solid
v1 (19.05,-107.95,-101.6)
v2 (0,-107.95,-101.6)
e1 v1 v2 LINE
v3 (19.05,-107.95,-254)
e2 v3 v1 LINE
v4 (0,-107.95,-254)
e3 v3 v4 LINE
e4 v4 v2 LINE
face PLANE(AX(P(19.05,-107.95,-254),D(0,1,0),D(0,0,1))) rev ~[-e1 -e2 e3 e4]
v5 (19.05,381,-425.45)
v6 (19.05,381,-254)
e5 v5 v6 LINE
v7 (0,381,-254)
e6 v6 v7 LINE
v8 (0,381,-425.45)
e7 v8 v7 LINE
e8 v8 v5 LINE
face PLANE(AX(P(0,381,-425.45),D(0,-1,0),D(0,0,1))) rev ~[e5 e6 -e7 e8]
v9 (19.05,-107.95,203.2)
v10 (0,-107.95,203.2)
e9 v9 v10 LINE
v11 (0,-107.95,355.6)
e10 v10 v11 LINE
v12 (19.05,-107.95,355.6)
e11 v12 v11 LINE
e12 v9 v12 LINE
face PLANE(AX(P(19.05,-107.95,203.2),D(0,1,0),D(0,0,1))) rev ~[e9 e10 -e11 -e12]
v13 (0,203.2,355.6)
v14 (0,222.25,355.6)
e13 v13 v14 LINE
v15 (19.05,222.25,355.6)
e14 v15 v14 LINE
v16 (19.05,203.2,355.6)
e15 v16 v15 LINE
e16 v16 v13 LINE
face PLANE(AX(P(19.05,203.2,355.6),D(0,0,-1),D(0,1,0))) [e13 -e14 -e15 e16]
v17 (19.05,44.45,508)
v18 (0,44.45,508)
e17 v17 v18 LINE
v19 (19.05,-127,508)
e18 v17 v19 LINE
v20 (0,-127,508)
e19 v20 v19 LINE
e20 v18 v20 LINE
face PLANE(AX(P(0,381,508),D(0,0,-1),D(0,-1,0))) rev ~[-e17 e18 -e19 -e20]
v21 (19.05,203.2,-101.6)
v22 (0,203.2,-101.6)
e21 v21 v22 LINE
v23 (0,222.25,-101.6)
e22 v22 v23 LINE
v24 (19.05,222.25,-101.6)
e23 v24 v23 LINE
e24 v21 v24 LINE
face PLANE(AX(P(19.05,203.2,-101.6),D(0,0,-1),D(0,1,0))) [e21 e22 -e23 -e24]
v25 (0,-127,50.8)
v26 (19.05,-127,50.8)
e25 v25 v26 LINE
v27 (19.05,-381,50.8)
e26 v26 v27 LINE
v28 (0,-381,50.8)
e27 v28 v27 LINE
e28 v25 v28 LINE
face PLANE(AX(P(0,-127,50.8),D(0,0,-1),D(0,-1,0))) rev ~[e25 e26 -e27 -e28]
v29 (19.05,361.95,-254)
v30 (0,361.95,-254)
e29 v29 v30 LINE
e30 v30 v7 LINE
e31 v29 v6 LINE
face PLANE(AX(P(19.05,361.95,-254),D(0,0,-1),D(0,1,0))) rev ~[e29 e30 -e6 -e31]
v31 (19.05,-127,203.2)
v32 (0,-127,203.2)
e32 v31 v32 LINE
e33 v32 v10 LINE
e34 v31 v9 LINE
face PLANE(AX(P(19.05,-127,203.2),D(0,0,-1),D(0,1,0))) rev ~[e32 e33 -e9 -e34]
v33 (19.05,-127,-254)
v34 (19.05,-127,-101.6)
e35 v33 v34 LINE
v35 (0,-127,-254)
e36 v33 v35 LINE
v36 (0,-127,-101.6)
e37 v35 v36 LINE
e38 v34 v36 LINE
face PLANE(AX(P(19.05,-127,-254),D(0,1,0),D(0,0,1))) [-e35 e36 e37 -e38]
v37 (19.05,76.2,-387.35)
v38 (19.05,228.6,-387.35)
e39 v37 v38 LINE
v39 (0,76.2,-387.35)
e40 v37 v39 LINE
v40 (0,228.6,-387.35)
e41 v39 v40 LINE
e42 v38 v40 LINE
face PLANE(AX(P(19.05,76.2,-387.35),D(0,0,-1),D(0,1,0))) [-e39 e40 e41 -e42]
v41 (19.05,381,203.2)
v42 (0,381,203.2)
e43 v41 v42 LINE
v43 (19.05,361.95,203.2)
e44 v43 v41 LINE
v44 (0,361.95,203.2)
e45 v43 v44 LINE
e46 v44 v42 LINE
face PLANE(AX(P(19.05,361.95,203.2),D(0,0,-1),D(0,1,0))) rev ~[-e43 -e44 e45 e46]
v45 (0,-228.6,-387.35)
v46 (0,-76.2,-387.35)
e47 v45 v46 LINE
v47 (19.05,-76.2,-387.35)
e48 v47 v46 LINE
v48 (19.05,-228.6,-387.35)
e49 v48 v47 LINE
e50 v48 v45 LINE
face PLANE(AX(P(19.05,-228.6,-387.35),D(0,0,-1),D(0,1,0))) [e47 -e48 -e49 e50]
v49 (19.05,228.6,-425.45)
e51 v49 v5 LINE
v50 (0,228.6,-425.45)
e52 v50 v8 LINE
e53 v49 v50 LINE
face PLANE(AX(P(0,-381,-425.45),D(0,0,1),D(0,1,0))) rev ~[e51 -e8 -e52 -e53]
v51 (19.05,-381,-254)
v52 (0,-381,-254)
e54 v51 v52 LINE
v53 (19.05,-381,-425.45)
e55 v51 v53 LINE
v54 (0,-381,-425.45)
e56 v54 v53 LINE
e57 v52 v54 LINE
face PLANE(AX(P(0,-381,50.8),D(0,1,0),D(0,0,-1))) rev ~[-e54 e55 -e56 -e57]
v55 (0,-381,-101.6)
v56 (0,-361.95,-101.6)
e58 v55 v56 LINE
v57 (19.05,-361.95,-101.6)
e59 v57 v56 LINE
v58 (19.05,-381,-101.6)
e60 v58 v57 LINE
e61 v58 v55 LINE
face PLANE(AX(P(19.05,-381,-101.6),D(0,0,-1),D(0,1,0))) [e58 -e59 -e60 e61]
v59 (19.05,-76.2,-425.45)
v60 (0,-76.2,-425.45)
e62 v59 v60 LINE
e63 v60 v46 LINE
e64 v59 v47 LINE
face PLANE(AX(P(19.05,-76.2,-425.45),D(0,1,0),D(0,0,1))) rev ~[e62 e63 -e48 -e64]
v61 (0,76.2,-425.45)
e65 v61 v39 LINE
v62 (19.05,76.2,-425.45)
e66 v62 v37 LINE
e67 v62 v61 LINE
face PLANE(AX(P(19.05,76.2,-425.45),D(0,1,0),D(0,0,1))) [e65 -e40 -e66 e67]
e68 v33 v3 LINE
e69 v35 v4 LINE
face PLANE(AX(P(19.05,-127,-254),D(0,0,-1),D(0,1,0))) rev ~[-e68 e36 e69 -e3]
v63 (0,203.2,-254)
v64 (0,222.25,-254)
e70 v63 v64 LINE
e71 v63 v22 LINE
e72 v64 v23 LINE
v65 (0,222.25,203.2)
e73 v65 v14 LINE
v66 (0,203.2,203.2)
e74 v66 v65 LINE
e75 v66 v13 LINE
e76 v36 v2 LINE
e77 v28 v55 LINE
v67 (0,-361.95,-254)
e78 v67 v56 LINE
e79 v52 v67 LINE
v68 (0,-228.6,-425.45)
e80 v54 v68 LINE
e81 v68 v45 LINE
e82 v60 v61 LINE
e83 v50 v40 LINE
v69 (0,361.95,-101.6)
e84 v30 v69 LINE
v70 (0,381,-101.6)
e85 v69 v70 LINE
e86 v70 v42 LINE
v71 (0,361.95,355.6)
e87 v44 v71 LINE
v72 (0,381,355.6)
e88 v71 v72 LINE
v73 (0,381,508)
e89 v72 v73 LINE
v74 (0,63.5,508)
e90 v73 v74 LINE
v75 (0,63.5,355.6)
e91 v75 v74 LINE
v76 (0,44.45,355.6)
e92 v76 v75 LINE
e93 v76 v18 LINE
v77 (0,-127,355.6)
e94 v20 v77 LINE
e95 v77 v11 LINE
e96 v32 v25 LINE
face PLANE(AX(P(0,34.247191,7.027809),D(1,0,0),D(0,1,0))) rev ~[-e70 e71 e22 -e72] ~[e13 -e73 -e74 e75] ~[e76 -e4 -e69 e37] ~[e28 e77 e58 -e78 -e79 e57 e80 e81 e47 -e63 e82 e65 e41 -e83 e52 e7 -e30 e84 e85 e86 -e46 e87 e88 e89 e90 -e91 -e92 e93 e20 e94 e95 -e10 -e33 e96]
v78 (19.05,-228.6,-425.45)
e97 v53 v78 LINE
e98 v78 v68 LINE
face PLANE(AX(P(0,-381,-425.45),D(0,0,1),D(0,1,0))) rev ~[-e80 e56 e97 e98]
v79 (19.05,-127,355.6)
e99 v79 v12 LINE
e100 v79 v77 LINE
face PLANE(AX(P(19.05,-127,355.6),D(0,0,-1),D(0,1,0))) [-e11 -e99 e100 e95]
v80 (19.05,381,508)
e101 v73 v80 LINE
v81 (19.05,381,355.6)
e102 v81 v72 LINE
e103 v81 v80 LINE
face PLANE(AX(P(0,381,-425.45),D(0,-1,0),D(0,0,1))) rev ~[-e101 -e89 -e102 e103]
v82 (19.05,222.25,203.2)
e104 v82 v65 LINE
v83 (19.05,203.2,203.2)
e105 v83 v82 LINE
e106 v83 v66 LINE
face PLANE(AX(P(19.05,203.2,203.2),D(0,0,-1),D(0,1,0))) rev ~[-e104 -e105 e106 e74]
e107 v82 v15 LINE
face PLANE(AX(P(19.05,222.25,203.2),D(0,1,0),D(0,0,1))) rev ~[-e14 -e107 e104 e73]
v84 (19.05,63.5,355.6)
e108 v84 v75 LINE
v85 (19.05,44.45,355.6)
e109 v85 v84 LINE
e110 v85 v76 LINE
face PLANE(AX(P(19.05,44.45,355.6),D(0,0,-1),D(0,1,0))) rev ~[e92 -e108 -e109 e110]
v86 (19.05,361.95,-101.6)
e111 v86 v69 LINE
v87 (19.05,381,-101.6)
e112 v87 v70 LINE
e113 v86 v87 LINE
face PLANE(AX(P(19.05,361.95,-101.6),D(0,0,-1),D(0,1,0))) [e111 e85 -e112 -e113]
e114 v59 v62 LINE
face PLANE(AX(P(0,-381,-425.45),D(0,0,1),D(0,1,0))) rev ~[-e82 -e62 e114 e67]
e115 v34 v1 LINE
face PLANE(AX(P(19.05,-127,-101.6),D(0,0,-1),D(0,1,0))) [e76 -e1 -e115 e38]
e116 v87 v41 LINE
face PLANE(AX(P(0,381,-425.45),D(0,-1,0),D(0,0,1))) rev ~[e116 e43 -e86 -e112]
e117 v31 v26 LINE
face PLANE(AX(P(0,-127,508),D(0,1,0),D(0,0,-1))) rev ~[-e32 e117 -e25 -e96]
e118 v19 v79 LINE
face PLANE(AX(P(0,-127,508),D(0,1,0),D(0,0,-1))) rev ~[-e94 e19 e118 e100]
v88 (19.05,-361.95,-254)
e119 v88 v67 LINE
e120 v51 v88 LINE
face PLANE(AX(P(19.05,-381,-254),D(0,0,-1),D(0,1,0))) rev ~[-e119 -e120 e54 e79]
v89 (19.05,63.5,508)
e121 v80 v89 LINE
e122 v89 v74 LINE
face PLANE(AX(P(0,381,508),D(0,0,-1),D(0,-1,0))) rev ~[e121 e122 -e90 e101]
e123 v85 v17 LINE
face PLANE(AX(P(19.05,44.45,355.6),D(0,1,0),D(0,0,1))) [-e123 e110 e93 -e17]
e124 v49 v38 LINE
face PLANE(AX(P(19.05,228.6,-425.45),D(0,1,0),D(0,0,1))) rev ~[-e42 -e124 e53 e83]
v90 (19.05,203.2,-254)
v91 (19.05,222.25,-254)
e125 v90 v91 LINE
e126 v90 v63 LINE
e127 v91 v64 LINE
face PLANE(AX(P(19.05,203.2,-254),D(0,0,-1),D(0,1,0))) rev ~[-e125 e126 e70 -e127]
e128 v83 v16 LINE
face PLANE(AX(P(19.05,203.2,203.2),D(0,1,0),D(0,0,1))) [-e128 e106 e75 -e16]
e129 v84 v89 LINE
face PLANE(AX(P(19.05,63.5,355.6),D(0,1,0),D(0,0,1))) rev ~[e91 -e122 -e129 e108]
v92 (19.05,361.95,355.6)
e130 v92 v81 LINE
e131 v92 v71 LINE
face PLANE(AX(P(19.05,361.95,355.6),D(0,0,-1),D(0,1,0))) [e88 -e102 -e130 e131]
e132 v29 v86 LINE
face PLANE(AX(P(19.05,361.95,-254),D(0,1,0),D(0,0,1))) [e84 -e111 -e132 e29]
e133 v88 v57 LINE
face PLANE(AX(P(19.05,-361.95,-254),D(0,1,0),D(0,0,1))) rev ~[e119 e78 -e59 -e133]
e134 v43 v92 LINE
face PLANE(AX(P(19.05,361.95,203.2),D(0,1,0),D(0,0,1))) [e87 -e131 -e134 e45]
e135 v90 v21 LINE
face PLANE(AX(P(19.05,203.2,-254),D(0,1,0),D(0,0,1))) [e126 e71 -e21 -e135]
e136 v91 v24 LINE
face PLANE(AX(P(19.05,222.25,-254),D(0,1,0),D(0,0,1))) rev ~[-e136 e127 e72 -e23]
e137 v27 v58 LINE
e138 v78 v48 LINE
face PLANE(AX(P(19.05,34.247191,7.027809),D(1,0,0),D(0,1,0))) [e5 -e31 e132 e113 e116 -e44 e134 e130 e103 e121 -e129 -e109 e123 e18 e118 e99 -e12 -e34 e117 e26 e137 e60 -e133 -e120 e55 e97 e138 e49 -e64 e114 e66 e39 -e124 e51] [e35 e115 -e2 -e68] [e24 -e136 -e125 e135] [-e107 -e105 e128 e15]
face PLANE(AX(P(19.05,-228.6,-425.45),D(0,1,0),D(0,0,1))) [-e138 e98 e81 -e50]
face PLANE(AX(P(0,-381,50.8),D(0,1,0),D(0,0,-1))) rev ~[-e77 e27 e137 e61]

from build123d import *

# Parameters (mm, degrees)
F1_DEPTH = 19.05
F2_W     = 19.05
F2_H     = 152.4
F2_W_2   = 152.4
F2_H_2   = 38.1
F3_DEPTH = 19.05


# Not quite as in the source:
# - a length typed as a fraction of an inch, garbled in the dataset ("3 / 203.2 mm" for 3/8 in), is restored


with BuildPart() as f1:
    # F0 (on Right) → F1 (new body)
    with BuildSketch(Plane.YZ):
        Polygon((-127, 50.8), (-381, 50.8), (-381, -425.45), (381, -425.45), (381, 508), (-127, 508), align=None)
    extrude(amount=F1_DEPTH)

    # F2 (on face) → F3 (cut)
    with BuildSketch(Plane.YZ.offset(19.05)):
        with Locations((371.475, 279.4)):
            Rectangle(F2_W, F2_H)
        with Locations((371.475, -177.8)):
            Rectangle(F2_W, F2_H)
        with Locations((53.975, 431.8)):
            Rectangle(F2_W, F2_H)
        with Locations((-117.475, 279.4)):
            Rectangle(F2_W, F2_H)
        with Locations((212.725, 279.4)):
            Rectangle(F2_W, F2_H)
        with Locations((212.725, -177.8)):
            Rectangle(F2_W, F2_H)
        with Locations((-117.475, -177.8)):
            Rectangle(F2_W, F2_H)
        with Locations((-371.475, -177.8)):
            Rectangle(F2_W, F2_H)
        with Locations((152.4, -406.4)):
            Rectangle(F2_W_2, F2_H_2)
        with Locations((-152.4, -406.4)):
            Rectangle(F2_W_2, F2_H_2)
    extrude(amount=-F3_DEPTH, mode=Mode.SUBTRACT)


solid = f1.part
